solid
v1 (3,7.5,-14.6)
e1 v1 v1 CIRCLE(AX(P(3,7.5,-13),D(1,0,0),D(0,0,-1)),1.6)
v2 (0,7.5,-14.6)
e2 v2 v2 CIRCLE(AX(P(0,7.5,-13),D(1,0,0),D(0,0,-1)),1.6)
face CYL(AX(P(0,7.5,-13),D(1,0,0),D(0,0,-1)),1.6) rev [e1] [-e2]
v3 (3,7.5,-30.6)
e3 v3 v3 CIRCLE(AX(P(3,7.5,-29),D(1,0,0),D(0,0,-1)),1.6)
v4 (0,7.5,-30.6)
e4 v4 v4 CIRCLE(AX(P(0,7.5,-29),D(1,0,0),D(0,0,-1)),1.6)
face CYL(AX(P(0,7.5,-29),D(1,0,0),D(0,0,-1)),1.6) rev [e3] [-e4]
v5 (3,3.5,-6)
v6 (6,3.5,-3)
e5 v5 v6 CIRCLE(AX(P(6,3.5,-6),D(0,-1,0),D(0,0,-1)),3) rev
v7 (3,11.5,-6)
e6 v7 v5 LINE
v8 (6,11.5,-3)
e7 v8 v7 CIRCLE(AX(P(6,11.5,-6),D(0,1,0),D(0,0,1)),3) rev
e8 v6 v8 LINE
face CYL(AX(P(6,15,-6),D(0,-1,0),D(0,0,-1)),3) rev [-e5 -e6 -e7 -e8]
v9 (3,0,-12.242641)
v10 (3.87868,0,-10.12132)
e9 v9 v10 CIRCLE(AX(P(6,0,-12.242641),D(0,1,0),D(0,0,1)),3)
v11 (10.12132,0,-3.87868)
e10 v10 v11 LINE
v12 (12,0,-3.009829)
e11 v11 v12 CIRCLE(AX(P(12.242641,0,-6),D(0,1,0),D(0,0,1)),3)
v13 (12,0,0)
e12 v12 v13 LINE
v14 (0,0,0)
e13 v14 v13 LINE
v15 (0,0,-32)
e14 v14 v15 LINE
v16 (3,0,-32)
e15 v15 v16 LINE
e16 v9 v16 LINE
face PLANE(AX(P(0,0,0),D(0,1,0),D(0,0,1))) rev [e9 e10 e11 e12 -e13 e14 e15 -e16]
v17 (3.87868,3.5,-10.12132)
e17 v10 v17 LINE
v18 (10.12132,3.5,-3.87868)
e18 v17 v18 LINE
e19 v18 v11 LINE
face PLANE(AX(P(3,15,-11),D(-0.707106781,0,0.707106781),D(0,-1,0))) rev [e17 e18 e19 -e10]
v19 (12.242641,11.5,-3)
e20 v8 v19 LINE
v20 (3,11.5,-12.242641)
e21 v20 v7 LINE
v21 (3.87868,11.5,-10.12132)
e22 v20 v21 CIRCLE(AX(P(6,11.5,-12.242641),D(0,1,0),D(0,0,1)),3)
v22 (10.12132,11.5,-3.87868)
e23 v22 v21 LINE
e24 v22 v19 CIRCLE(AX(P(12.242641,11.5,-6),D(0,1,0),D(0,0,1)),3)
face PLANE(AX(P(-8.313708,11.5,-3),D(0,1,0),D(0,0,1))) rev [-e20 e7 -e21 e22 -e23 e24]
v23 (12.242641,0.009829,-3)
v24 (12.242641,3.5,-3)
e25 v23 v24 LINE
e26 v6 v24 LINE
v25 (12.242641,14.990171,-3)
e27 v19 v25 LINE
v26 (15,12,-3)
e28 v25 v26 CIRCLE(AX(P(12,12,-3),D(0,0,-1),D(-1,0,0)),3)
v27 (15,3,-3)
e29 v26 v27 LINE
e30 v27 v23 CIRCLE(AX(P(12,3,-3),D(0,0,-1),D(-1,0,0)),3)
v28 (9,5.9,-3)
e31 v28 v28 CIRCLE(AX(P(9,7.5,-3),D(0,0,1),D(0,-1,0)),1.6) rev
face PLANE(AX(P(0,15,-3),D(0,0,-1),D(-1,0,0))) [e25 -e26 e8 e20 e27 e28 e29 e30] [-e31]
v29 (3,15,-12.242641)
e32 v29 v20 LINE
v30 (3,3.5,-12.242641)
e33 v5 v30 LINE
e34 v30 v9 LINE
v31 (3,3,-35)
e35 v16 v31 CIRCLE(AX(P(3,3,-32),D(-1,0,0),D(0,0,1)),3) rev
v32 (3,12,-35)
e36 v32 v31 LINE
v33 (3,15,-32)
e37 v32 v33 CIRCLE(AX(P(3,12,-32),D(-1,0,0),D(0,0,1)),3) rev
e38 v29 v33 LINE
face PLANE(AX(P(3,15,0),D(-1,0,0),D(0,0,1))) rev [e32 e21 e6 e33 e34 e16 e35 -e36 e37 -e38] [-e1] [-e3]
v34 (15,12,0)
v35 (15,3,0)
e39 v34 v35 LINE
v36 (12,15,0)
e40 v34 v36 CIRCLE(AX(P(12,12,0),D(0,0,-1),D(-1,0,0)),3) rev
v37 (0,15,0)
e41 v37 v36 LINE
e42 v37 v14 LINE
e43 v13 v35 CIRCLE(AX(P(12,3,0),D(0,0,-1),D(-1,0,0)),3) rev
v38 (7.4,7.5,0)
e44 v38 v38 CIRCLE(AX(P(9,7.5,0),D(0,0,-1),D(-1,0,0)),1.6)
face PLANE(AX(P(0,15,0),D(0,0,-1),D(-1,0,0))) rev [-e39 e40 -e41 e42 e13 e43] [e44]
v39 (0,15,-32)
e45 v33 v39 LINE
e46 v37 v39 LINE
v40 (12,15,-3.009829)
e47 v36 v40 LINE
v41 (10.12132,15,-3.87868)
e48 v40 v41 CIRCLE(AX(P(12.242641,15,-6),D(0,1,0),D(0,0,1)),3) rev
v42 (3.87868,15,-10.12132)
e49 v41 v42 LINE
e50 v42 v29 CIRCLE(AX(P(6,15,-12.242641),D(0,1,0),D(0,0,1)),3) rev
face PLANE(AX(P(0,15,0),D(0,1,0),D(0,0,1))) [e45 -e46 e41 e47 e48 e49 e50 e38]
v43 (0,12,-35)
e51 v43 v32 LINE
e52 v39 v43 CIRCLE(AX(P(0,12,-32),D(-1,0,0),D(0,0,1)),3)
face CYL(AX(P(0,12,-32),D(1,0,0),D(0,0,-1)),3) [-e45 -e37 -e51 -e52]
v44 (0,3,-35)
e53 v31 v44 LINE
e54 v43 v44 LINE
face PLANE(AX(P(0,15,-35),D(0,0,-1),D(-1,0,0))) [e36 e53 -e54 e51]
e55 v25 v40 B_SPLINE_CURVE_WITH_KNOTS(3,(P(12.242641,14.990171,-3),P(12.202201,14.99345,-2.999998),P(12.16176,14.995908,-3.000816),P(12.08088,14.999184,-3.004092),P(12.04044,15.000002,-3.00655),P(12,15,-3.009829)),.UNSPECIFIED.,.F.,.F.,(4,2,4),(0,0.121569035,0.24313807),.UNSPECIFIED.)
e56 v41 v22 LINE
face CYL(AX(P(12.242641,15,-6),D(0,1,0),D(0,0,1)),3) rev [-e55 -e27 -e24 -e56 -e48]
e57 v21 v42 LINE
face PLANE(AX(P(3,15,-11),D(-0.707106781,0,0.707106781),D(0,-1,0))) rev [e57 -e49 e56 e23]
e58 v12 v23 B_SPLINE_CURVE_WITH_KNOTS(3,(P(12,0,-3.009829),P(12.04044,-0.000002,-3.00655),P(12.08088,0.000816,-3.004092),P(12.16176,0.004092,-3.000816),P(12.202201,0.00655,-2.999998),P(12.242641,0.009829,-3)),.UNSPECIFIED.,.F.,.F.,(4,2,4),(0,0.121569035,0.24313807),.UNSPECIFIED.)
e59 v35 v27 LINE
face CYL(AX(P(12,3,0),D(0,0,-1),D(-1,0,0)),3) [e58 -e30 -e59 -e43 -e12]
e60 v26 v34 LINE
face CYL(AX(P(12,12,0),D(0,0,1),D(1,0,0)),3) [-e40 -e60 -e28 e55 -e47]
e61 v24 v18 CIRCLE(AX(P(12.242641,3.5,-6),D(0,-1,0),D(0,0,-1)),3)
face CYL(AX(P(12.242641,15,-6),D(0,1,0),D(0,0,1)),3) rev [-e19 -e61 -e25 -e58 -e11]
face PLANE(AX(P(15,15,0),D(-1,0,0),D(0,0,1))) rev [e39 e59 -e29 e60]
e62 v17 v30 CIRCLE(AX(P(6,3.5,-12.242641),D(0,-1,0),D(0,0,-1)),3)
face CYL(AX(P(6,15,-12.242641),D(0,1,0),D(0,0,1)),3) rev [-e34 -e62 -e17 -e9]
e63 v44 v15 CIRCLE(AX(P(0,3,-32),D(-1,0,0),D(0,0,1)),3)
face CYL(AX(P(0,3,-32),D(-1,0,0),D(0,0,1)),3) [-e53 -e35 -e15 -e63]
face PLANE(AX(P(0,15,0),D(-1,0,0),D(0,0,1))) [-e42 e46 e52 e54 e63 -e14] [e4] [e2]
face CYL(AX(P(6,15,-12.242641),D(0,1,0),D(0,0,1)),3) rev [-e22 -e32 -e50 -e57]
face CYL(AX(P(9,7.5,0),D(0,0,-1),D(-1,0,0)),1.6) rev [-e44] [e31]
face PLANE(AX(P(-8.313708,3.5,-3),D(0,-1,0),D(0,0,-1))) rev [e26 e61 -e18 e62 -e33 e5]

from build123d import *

# Parameters (mm, degrees)
SKETCH1_W           = 3
SKETCH1_H           = 32
SKETCH1_H_2         = 3
SKETCH1_W_2         = 12
BOSS_EXTRUDE1_DEPTH = 15
SKETCH2_R           = 1.6
CUT_EXTRUDE1_DEPTH  = 39.392707641
SKETCH3_R           = 1.6
CUT_EXTRUDE2_DEPTH  = 40.924929555
FILLET1_R           = 3
CHAMFER1_SIZE       = 8
SKETCH6_W           = 8
SKETCH6_H           = 8
CUT_EXTRUDE5_DEPTH  = 12
FILLET2_R           = 3


with BuildPart() as part:
    # Sketch1 → Boss-Extrude1 (new body)
    with BuildSketch(Plane(origin=(0, 0, 0), x_dir=(1, 0, 0), z_dir=(0, 1, 0))):
        with Locations((1.5, 19)):
            Rectangle(SKETCH1_W, SKETCH1_H)
        with Locations((1.5, 1.5)):
            Rectangle(SKETCH1_W, SKETCH1_H_2)
        with Locations((9, 1.5)):
            Rectangle(SKETCH1_W_2, SKETCH1_H_2)
    extrude(amount=BOSS_EXTRUDE1_DEPTH)

    # Sketch2 → Cut-Extrude1 (cut, through all)
    with BuildSketch(Plane(origin=(0, 0, -3), x_dir=(-1, 0, 0), z_dir=(0, 0, -1))):
        with Locations((-9, 7.5)):
            Circle(SKETCH2_R)
    extrude(amount=-CUT_EXTRUDE1_DEPTH, mode=Mode.SUBTRACT)

    # Sketch3 → Cut-Extrude2 (cut, through all)
    with BuildSketch(Plane(origin=(3, 0, 0), x_dir=(0, 0, -1), z_dir=(1, 0, 0))):
        with Locations((13, 7.5)):
            Circle(SKETCH3_R)
        with Locations((29, 7.5)):
            Circle(SKETCH3_R)
    extrude(amount=-CUT_EXTRUDE2_DEPTH, mode=Mode.SUBTRACT)

    # Fillet1
    fillet1_edges = [part.edges().sort_by_distance(p)[0] for p in [
        (15, 15, -1.5),
        (1.5, 15, -35),
        (1.5, 0, -35),
        (15, 0, -1.5),
    ]]
    fillet(fillet1_edges, radius=FILLET1_R)

    # Chamfer1
    # the kernel refuses this chamfer: 8 mm, written as the material it adds along each edge
    with BuildSketch(Plane(origin=(3, 0, -3), x_dir=(-0.027495876610586382, 0, -0.9996219169112968), z_dir=(0, 1, 0))) as chamfer1_piece_1_section:
        Polygon((CHAMFER1_SIZE * 0.999621916911, -CHAMFER1_SIZE * 0.0274958766106), (-CHAMFER1_SIZE * 0.0274958766106, -CHAMFER1_SIZE * 0.999621916911), (0, 0), align=None)
    chamfer1_piece_1 = extrude(amount=15, mode=Mode.PRIVATE)
    chamfer1_piece_1 = chamfer1_piece_1 - Plane(origin=(9, 7.5, -5.695402836), x_dir=(-1, 0, 0), z_dir=(0, 0, -1)) * Cylinder(1.6, 62, mode=Mode.PRIVATE)
    add(chamfer1_piece_1)

    # Sketch6 → Cut-Extrude5 (cut)
    with BuildSketch(Plane(origin=(15, 0, 0), x_dir=(0, 0, -1), z_dir=(1, 0, 0))):
        with Locations((7, 7.5)):
            Rectangle(SKETCH6_W, SKETCH6_H)
    extrude(amount=-CUT_EXTRUDE5_DEPTH, mode=Mode.SUBTRACT)

    # Fillet2
    fillet2_edges = [part.edges().sort_by_distance(p)[0] for p in [
        (3, 7.5, -3),
        (11, 1.75, -3),
        (3, 1.75, -11),
        (3, 13.25, -11),
        (11, 13.25, -3),
    ]]
    fillet(fillet2_edges, radius=FILLET2_R)


solid = part.part
